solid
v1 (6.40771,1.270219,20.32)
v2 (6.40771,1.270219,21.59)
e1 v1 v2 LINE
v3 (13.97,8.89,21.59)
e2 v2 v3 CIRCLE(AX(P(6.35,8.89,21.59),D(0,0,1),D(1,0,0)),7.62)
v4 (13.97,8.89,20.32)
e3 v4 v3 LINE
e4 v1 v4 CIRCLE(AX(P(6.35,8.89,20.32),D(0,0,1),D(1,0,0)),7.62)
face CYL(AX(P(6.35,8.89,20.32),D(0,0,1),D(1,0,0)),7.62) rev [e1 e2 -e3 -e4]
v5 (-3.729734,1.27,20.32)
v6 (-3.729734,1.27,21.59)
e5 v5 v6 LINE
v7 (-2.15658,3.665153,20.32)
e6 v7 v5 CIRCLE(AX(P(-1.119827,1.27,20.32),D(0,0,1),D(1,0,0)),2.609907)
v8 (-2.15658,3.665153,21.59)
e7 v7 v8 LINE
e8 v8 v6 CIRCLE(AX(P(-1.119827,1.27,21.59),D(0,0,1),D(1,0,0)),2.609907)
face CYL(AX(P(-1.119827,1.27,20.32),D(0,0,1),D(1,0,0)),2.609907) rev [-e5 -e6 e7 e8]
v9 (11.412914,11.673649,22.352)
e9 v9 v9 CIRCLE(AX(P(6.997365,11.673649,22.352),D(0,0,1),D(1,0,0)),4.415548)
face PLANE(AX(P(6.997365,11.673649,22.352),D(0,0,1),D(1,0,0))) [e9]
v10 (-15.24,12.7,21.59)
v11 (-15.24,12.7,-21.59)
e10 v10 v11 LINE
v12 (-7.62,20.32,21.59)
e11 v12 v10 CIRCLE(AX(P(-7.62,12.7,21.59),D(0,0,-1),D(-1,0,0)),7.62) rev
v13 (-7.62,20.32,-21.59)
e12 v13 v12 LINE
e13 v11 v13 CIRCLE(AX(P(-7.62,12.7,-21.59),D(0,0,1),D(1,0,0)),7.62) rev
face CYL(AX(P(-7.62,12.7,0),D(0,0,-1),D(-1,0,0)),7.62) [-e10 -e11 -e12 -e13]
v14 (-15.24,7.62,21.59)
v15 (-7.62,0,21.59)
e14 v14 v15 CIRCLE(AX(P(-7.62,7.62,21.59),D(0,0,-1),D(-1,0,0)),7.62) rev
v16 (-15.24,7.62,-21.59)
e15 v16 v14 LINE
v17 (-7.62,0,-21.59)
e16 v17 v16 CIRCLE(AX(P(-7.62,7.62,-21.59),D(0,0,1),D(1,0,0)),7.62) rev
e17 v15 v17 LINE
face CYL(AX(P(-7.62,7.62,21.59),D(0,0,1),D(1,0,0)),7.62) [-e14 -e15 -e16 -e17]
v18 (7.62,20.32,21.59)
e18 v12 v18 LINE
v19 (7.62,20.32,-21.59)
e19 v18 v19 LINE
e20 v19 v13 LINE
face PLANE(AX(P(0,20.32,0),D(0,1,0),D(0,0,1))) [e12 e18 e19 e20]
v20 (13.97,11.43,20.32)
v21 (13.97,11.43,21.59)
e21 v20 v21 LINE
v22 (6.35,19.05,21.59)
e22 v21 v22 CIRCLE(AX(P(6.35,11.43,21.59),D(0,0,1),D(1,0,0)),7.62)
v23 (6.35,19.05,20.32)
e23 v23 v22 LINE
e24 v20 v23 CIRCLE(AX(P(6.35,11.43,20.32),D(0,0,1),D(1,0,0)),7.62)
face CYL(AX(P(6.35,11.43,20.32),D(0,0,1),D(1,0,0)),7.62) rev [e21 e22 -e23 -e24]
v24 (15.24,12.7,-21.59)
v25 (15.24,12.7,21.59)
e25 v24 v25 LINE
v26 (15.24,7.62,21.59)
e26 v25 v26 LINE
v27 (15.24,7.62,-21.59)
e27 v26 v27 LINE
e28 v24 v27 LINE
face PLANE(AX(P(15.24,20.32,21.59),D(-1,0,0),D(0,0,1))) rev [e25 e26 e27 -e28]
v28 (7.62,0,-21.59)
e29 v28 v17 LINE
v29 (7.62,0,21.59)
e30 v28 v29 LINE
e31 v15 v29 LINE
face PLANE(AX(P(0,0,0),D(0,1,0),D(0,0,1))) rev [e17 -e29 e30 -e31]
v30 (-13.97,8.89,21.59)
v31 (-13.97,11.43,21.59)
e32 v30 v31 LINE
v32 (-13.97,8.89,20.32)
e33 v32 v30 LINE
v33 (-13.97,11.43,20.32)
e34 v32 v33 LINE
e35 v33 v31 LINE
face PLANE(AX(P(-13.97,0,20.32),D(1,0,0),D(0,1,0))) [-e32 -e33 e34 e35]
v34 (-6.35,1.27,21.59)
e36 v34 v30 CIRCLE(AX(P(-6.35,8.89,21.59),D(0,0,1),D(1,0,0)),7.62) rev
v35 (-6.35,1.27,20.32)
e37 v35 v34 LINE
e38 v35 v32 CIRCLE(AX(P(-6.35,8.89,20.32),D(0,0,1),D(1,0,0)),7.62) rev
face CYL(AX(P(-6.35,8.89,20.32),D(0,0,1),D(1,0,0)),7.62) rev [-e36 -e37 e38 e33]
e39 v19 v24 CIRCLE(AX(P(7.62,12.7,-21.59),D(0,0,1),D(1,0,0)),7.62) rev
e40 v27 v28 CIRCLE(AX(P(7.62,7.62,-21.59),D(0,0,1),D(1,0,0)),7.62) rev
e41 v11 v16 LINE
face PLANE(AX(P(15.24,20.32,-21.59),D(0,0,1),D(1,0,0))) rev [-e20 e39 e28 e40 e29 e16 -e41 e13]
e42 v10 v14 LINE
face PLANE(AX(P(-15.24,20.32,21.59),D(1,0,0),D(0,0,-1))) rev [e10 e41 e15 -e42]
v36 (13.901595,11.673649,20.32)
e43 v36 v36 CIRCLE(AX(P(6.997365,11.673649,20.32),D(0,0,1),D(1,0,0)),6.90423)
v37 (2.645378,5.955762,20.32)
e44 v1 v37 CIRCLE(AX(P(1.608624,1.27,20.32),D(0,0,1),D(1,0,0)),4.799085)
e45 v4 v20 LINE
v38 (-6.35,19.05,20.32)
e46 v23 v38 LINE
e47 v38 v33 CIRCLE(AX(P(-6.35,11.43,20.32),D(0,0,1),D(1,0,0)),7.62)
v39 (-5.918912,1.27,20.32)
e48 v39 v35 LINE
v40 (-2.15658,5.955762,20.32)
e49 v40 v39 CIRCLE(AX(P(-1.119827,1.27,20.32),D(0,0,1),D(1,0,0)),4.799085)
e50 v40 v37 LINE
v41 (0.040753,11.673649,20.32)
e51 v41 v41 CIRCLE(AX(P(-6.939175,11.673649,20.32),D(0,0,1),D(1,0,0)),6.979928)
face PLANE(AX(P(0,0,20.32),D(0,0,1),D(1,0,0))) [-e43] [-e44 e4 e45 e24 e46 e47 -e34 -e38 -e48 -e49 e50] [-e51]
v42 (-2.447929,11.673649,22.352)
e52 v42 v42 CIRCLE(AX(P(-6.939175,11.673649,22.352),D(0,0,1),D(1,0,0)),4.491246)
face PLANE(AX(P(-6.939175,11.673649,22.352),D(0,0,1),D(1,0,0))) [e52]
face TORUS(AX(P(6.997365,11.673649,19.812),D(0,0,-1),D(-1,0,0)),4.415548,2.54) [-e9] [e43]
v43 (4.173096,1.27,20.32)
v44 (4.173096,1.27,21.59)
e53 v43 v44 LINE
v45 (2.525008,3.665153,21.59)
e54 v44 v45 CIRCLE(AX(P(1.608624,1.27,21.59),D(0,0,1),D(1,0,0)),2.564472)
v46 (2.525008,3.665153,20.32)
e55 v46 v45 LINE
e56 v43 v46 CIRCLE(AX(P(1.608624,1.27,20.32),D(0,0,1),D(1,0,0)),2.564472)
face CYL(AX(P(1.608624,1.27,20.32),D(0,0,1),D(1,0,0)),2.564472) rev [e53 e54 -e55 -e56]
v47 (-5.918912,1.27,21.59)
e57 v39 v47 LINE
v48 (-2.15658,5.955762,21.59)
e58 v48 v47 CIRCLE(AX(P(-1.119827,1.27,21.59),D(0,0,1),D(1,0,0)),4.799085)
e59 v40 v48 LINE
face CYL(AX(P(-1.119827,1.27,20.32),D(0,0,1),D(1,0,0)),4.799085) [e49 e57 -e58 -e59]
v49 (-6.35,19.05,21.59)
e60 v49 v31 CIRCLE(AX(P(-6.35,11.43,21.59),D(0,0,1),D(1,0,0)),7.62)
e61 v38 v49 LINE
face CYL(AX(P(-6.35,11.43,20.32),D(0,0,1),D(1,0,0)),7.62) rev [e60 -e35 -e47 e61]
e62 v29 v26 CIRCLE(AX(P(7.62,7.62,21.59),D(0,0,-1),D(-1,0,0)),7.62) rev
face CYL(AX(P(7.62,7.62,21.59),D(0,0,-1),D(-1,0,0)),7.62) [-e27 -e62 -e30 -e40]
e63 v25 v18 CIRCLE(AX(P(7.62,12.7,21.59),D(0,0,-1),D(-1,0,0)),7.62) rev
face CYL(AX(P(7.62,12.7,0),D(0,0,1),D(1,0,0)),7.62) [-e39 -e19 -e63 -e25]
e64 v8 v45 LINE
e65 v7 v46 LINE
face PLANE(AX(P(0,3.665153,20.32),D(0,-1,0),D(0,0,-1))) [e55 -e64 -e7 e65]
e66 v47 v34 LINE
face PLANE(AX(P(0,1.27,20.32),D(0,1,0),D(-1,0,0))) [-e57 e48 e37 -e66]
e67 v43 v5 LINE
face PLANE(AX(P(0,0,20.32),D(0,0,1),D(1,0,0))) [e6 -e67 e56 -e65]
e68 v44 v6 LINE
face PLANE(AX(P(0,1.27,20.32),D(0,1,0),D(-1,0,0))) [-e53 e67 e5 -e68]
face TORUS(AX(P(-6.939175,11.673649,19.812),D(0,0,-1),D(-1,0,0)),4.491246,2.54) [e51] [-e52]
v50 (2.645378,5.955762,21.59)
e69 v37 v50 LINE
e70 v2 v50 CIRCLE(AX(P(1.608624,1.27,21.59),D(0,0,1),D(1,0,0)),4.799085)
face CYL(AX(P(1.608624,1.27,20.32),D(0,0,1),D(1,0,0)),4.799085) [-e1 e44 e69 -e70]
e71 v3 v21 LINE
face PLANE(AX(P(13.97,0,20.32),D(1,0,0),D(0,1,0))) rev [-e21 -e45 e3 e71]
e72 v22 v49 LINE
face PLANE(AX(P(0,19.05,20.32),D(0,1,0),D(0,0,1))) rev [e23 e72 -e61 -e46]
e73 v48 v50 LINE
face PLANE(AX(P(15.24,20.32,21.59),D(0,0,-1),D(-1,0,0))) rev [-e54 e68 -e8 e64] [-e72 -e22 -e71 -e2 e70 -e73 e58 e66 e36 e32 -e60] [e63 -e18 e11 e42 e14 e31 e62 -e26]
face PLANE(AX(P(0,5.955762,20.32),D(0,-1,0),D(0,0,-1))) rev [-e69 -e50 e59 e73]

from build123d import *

# Parameters (mm, degrees)
SKETCH1_W           = 30.48
SKETCH1_H           = 43.18
BOSS_EXTRUDE1_DEPTH = 20.32
FILLET1_R           = 7.62
CUT_EXTRUDE2_DEPTH  = 1.27
SKETCH3_R           = 6.979927777
SKETCH3_R_2         = 6.904229814
BOSS_EXTRUDE2_DEPTH = 2.032
FILLET2_R           = 2.54


with BuildPart() as part:
    # Sketch1 → Boss-Extrude1 (new body)
    with BuildSketch(Plane(origin=(0, 0, 0), x_dir=(1, 0, 0), z_dir=(0, 1, 0))):
        Rectangle(SKETCH1_W, SKETCH1_H)
    extrude(amount=BOSS_EXTRUDE1_DEPTH)

    # Fillet1
    fillet1_edges = [part.edges().sort_by_distance(p)[0] for p in [
        (15.24, 20.32, 0),
        (-15.24, 20.32, 0),
        (15.24, 0, 0),
        (-15.24, 0, 0),
    ]]
    fillet(fillet1_edges, radius=FILLET1_R)

    # Sketch2 → Cut-Extrude2 (cut)
    with BuildSketch(Plane.XY.offset(21.59)):
        with BuildLine():
            Line((-3.729733948, 1.27), (4.173096077, 1.27))
            ThreePointArc((4.173096077, 1.27), (3.721271351, 2.723698057), (2.525007795, 3.66515285))
            Line((2.525007795, 3.66515285), (-2.15658026, 3.66515285))
            ThreePointArc((-2.15658026, 3.66515285), (-3.301276498, 2.702791829), (-3.729733948, 1.27))
        make_face()
        with BuildLine():
            ThreePointArc((2.645377511, 5.955761741), (5.350660012, 4.274727675), (6.407709564, 1.270218533))
            ThreePointArc((6.407709564, 1.270218533), (11.758518599, 3.522288517), (13.97, 8.89))
            Line((13.97, 8.89), (13.97, 11.43))
            ThreePointArc((13.97, 11.43), (11.738153673, 16.818153673), (6.35, 19.05))
            Line((6.35, 19.05), (-6.35, 19.05))
            ThreePointArc((-6.35, 19.05), (-11.738153673, 16.818153673), (-13.97, 11.43))
            Line((-13.97, 11.43), (-13.97, 8.89))
            ThreePointArc((-13.97, 8.89), (-11.738153673, 3.501846327), (-6.35, 1.27))
            Line((-6.35, 1.27), (-5.918912318, 1.27))
            ThreePointArc((-5.918912318, 1.27), (-4.861931172, 4.274642475), (-2.15658026, 5.955761741))
            Line((-2.15658026, 5.955761741), (2.645377511, 5.955761741))
        make_face()
    extrude(amount=-CUT_EXTRUDE2_DEPTH, mode=Mode.SUBTRACT)

    # Sketch3 → Boss-Extrude2 (add)
    with BuildSketch(Plane.XY.offset(20.32)):
        with Locations((-6.939175258, 11.673649258)):
            Circle(SKETCH3_R)
        with Locations((6.997365407, 11.673649258)):
            Circle(SKETCH3_R_2)
    extrude(amount=BOSS_EXTRUDE2_DEPTH)

    # Fillet2
    # the kernel refuses this fillet: 2.54 mm, written as the material it takes off along each edge
    with BuildSketch(Plane(origin=(-6.939175258, 11.673649258, 22.352), x_dir=(1, 0, 0), z_dir=(0, -1, 0))) as fillet2_piece_1:
        with BuildLine():
            CenterArc((4.491246199, -2.54), FILLET2_R, 11.536959033, 78.463040967)
            Line((4.491246199, 0), (6.979927777, 0))
            Line((6.979927777, 0), (6.979927777, -2.032))
        make_face()
    revolve(axis=Axis((-6.939175258, 11.673649258, 22.352), (0, 0, 1)), mode=Mode.SUBTRACT)
    with BuildSketch(Plane(origin=(6.997365407, 11.673649258, 22.352), x_dir=(1, 0, 0), z_dir=(0, -1, 0))) as fillet2_piece_2:
        with BuildLine():
            CenterArc((4.415548235, -2.54), FILLET2_R, 11.536959033, 78.463040967)
            Line((4.415548235, 0), (6.904229814, 0))
            Line((6.904229814, 0), (6.904229814, -2.032))
        make_face()
    revolve(axis=Axis((6.997365407, 11.673649258, 22.352), (0, 0, 1)), mode=Mode.SUBTRACT)


solid = part.part
